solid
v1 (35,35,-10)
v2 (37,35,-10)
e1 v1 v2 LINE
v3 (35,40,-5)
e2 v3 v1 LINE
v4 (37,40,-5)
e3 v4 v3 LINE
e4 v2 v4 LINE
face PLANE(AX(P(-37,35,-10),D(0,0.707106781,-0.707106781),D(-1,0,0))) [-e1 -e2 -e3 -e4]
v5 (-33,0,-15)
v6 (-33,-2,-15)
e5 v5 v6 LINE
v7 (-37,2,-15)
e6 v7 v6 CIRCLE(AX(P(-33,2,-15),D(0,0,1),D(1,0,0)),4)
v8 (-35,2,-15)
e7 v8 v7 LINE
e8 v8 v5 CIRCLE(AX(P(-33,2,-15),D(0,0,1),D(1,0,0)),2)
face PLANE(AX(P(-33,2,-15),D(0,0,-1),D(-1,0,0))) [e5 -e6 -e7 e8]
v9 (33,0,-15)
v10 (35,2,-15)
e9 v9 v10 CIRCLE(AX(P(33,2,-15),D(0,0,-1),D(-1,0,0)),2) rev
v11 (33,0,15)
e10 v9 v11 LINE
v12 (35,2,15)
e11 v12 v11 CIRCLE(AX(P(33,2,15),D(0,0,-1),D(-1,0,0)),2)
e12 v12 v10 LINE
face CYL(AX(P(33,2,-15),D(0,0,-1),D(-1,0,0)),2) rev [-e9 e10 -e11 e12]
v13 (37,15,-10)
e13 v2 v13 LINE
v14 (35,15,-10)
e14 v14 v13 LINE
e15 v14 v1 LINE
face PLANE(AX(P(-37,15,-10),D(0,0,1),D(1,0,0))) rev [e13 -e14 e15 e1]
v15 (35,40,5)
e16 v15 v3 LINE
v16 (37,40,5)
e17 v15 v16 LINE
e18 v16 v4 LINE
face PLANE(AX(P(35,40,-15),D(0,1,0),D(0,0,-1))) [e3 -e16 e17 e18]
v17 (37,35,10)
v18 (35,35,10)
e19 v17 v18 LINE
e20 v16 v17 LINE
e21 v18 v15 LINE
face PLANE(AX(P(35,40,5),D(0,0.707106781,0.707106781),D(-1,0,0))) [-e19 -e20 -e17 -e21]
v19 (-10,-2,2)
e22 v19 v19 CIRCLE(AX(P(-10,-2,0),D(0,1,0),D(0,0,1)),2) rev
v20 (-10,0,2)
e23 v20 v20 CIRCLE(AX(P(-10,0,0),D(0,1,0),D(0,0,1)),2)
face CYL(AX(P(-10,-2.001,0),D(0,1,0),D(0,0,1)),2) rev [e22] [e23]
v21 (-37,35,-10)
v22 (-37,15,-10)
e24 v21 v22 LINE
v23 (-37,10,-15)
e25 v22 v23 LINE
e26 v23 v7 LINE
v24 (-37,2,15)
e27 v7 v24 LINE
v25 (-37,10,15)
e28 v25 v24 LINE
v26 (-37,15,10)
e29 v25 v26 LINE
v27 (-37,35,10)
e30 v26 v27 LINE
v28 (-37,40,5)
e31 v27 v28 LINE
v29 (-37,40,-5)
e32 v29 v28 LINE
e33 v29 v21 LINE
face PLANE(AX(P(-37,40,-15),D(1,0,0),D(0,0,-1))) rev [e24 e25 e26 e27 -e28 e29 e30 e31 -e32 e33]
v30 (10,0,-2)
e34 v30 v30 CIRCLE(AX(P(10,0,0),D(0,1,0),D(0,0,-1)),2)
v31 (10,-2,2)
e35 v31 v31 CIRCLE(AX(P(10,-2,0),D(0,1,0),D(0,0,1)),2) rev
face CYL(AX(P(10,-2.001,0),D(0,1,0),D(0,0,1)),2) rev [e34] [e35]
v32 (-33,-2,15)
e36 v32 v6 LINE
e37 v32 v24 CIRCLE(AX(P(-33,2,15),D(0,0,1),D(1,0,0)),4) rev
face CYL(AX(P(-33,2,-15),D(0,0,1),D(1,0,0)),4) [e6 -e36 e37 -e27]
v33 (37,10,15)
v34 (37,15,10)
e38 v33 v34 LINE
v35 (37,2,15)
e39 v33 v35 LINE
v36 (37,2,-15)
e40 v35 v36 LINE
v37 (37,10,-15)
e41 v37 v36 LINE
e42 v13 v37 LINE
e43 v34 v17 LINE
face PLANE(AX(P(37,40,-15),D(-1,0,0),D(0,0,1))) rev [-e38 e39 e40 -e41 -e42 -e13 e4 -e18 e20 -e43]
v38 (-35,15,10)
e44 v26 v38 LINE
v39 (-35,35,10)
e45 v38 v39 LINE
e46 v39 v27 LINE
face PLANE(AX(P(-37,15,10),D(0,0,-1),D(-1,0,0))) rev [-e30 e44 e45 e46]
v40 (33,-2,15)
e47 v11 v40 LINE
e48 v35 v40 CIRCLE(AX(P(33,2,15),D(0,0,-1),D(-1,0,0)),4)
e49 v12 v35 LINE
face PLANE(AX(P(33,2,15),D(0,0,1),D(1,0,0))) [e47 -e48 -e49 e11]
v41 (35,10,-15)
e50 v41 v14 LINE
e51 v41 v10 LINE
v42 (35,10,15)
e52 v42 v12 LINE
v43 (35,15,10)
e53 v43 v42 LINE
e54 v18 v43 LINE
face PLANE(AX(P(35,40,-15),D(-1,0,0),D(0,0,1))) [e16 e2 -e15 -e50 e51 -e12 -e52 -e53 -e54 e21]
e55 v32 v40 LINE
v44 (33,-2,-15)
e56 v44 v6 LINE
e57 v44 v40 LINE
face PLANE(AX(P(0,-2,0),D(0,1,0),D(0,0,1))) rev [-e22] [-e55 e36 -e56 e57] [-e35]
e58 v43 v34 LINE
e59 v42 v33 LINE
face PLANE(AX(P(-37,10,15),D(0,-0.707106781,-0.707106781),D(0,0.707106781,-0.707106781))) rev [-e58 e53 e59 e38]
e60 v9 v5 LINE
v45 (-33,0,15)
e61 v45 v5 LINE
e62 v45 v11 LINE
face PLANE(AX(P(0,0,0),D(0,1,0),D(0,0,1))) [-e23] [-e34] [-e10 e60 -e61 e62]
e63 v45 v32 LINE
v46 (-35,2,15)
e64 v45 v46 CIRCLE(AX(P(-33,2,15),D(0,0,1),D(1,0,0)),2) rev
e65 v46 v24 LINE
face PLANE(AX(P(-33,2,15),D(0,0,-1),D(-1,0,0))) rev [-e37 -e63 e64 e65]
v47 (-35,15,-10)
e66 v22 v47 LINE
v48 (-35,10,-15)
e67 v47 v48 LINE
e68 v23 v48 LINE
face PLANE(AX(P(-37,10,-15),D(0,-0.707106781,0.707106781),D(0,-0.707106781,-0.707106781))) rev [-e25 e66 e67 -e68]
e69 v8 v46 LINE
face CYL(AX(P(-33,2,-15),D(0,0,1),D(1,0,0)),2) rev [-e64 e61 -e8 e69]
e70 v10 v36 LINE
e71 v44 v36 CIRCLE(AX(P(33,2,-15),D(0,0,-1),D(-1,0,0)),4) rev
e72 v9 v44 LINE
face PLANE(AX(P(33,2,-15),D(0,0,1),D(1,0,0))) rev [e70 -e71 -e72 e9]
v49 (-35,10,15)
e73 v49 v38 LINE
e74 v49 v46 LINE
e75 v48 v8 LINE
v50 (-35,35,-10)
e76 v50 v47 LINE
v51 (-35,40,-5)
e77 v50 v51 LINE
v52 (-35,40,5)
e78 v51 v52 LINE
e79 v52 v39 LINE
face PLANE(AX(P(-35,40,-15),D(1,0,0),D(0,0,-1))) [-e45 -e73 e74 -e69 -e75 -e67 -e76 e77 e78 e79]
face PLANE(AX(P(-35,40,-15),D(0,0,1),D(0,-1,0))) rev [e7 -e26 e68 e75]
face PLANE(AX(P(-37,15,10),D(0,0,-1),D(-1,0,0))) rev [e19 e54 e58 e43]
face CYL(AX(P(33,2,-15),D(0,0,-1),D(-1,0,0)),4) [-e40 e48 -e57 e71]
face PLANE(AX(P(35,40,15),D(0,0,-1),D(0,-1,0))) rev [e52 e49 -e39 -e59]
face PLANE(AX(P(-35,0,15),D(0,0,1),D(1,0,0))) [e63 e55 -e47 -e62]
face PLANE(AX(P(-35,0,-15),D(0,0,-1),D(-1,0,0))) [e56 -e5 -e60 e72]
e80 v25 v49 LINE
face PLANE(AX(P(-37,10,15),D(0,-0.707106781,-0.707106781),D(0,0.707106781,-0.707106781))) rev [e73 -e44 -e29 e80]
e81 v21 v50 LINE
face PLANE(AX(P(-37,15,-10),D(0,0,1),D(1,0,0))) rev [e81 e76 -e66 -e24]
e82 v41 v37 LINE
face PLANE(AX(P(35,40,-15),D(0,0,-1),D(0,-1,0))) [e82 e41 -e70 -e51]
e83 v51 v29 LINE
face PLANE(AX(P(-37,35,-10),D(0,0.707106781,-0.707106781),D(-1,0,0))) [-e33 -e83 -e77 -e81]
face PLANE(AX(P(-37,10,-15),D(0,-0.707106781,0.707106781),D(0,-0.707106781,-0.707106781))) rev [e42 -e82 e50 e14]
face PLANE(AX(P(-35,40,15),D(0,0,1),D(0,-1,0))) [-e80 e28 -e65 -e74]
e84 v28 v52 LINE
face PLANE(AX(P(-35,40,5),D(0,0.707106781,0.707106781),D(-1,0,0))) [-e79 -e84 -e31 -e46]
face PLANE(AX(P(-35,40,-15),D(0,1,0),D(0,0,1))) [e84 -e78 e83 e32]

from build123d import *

# Parameters (mm, degrees)
SKETCH_1_W               = 70
SKETCH_1_H               = 30
EXTRUDE_1_DEPTH          = 40
SHEET_START              = -15
SHEET_METAL_1_DEPTH      = 30
SHEET_METAL_1_2_DEPTH    = 30
CUT_EXTRUDE_1_REACH      = 58.515
SKETCH_6_R               = 2
CUT_EXTRUDE_3_DEPTH      = 57.515484604
CUT_EXTRUDE_3_DEPTH_BACK = 57.515484604
CHAMFER_1_SIZE           = 5


# Read off the part's stored shape, not the designer's step: 转换实体1
with BuildPart() as part:
    # Sketch 1 → 凸台-拉伸1 (new body)
    with BuildSketch(Plane(origin=(0, 0, 0), x_dir=(1, 0, 0), z_dir=(0, 1, 0))):
        Rectangle(SKETCH_1_W, SKETCH_1_H)
    extrude(amount=EXTRUDE_1_DEPTH)

    # Sheet Metal 1 outline → Sheet Metal 1 (cut)
    with BuildSketch(Plane.XY.offset(SHEET_START)):
        with BuildLine():
            Line((35, 2), (35, 40))
            Line((35, 40), (-35, 40))
            Line((-35, 40), (-35, 2))
            ThreePointArc((-35, 2), (-34.414213562, 0.585786438), (-33, 0))
            Line((-33, 0), (33, 0))
            ThreePointArc((33, 0), (34.414213562, 0.585786438), (35, 2))
        make_face()
    extrude(amount=SHEET_METAL_1_DEPTH, mode=Mode.SUBTRACT)

    # Sheet Metal 1 2 outline → Sheet Metal 1 2 (add)
    with BuildSketch(Plane.XY.offset(SHEET_START)):
        with BuildLine():
            Line((37, 2), (37, 40))
            Line((37, 40), (35, 40))
            Line((35, 40), (35, 0))
            Line((35, 0), (-35, 0))
            Line((-35, 0), (-35, 40))
            Line((-35, 40), (-37, 40))
            Line((-37, 40), (-37, 2))
            ThreePointArc((-37, 2), (-35.828427125, -0.828427125), (-33, -2))
            Line((-33, -2), (33, -2))
            ThreePointArc((33, -2), (35.828427125, -0.828427125), (37, 2))
        make_face()
    extrude(amount=SHEET_METAL_1_2_DEPTH)

    # 草图6 → 切除-拉伸1 (cut, up to next)
    with BuildSketch(Plane(origin=(0, 0, 0), x_dir=(1, 0, 0), z_dir=(0, 1, 0)), mode=Mode.PRIVATE) as cut_extrude_1_sk1:
        with Locations(Location((-10, 0, 0), (0, 0, 270))):
            Circle(SKETCH_6_R)
    cut_extrude_1_tool1 = extrude(cut_extrude_1_sk1.sketch, amount=-CUT_EXTRUDE_1_REACH, mode=Mode.PRIVATE) & part.part
    # 草图6 → 切除-拉伸1 (cut, up to next)
    with BuildSketch(Plane(origin=(0, 0, 0), x_dir=(1, 0, 0), z_dir=(0, 1, 0)), mode=Mode.PRIVATE) as cut_extrude_1_sk2:
        with Locations(Location((10, 0, 0), (0, 0, 270))):
            Circle(SKETCH_6_R)
    cut_extrude_1_tool2 = extrude(cut_extrude_1_sk2.sketch, amount=-CUT_EXTRUDE_1_REACH, mode=Mode.PRIVATE) & part.part
    add(cut_extrude_1_tool1.solids().sort_by_distance((-10, 0, 0))[0], mode=Mode.SUBTRACT)
    add(cut_extrude_1_tool2.solids().sort_by_distance((10, 0, 0))[0], mode=Mode.SUBTRACT)

    # 草图7 → 切除-拉伸3 (cut, two sides: drawn at the far end of the back side and taken through both)
    with BuildSketch(Plane(origin=(0, 0, 0), x_dir=(0, 0, -1), z_dir=(1, 0, 0)).offset(-CUT_EXTRUDE_3_DEPTH_BACK)):
        Polygon((-15, 10), (-10, 15), (-10, 40), (-15, 40), align=None)
        Polygon((10, 15), (10, 40), (15, 40), (15, 10), align=None)
    extrude(amount=CUT_EXTRUDE_3_DEPTH + CUT_EXTRUDE_3_DEPTH_BACK, mode=Mode.SUBTRACT)

    # 倒角1
    chamfer_1_edges = [part.edges().sort_by_distance(p)[0] for p in [
        (-36, 40, 10),
        (36, 40, 10),
        (-36, 40, -10),
        (36, 40, -10),
    ]]
    chamfer(chamfer_1_edges, length=CHAMFER_1_SIZE)


solid = part.part
